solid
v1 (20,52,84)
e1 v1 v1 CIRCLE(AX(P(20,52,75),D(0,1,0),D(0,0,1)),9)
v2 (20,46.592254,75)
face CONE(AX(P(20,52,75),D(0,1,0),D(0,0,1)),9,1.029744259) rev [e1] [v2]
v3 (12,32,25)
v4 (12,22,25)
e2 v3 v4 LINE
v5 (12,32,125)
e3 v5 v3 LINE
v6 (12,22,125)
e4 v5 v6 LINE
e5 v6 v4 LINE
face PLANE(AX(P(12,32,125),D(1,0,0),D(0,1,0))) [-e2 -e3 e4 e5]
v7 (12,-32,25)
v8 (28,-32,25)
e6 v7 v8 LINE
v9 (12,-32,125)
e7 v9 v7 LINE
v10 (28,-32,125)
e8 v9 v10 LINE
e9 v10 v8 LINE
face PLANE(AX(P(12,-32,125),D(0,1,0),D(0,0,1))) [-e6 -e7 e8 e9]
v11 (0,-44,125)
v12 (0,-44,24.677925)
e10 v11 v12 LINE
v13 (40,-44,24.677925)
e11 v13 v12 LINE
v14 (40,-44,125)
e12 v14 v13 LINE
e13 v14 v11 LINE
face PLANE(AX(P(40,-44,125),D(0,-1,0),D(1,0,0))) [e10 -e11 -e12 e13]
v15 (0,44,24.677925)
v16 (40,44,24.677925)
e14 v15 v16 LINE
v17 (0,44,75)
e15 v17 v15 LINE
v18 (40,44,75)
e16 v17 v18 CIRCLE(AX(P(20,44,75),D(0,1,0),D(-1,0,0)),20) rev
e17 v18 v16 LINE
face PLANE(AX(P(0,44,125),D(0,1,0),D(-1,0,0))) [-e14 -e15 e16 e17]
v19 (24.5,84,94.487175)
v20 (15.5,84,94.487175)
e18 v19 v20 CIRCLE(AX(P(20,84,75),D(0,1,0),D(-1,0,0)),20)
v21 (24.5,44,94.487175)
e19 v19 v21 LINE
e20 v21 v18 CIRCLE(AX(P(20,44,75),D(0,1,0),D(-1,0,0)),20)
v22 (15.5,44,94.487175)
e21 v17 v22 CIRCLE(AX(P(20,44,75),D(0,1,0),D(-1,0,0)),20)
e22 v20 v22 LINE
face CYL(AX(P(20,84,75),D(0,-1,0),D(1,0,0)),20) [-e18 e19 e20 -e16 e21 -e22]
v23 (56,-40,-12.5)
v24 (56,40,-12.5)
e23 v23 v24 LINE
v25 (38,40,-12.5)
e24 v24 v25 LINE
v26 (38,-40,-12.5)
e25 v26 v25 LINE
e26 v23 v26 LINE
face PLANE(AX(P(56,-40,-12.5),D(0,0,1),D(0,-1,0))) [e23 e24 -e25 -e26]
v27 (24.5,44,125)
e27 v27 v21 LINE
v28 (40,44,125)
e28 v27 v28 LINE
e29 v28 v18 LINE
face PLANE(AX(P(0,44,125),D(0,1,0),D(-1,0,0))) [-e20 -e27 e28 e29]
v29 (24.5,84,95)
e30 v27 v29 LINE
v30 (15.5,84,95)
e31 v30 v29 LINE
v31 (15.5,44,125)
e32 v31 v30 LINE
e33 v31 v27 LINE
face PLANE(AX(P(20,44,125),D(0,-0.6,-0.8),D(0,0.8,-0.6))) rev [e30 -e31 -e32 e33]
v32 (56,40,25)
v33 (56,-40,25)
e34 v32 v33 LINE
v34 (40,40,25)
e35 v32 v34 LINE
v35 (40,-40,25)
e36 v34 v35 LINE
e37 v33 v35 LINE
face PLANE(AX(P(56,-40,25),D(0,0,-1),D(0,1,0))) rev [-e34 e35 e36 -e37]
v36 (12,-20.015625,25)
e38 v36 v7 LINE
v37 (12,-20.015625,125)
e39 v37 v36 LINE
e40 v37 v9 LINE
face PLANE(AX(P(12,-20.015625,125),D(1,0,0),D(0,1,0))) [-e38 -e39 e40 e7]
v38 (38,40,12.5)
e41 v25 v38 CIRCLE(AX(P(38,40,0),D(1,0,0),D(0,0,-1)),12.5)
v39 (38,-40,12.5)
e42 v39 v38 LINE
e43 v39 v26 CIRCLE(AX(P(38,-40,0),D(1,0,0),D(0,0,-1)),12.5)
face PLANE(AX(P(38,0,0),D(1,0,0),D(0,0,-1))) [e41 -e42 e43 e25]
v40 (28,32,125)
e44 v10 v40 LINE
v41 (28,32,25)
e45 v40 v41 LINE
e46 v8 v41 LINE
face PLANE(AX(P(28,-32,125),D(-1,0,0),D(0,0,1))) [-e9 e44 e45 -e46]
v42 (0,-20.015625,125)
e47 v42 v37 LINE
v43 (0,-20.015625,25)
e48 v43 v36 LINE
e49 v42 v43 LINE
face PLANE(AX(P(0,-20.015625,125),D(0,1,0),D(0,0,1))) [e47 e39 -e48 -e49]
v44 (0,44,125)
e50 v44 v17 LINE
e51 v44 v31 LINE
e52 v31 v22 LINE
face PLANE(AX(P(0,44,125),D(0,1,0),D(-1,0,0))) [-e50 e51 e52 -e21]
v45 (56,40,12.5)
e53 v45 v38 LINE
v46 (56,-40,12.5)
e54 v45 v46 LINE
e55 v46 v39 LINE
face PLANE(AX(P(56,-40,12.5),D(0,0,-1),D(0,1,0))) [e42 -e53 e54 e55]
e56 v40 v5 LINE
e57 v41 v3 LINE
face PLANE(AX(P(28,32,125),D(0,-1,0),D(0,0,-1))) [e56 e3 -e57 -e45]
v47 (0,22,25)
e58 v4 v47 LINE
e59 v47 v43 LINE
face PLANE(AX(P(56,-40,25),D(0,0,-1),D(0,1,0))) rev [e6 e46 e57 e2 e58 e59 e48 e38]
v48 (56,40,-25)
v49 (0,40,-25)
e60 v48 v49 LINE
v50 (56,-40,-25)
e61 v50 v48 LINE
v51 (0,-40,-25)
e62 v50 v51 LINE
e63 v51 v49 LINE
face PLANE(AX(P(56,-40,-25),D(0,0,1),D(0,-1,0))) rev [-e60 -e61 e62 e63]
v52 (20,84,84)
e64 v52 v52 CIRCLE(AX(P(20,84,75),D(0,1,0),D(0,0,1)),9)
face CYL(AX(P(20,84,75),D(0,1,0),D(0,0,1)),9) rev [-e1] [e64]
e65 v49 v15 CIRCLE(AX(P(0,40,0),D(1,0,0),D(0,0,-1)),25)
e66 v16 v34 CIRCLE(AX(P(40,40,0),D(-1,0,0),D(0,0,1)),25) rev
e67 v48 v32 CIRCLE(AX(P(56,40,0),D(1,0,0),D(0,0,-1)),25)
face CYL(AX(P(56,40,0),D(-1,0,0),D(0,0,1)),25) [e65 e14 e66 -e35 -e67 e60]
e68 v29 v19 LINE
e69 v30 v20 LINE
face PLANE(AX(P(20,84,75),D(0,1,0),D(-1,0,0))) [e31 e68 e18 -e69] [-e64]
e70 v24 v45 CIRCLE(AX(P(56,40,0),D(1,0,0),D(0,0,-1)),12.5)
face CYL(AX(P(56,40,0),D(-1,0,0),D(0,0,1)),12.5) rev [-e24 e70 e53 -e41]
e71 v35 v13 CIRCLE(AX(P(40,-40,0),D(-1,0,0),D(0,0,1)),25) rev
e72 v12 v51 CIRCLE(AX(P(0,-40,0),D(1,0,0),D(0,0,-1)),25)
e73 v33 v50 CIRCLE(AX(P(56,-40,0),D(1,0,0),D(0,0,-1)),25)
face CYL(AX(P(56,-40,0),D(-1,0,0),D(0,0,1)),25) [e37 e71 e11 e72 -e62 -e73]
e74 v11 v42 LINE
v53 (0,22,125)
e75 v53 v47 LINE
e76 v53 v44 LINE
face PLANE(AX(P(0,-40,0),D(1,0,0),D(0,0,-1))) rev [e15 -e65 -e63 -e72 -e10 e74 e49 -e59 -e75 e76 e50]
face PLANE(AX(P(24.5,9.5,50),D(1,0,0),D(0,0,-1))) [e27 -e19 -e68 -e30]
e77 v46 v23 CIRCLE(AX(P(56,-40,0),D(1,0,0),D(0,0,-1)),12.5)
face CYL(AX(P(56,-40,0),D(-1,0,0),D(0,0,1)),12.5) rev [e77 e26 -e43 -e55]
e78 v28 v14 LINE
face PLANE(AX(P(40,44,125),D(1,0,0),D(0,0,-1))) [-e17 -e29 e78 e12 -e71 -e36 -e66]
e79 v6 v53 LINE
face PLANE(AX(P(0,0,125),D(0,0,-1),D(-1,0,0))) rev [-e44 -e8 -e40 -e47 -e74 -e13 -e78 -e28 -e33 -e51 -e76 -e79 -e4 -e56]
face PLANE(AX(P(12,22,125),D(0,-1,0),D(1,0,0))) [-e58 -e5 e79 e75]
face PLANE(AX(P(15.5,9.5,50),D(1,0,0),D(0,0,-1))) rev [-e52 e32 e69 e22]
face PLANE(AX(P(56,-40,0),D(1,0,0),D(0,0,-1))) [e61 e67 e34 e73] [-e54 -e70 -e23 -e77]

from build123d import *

# Parameters (mm, degrees)
BOSS_EXTRUDE1_DEPTH        = 56
BOSS_EXTRUDE2_DEPTH        = 38
BOSS_EXTRUDE3_START        = -0.322075
BOSS_EXTRUDE3_DEPTH        = 100.322075
SKETCH3_R                  = 20
BOSS_EXTRUDE4_DEPTH        = 40
RIB2_START                 = -4.5
RIB2_DEPTH                 = 9
F_10_0MM_DOWEL_HOLE1_D     = 18
F_10_0MM_DOWEL_HOLE1_DEPTH = 32
F_10_0MM_DOWEL_HOLE1_TIP   = 5.407745571


with BuildPart() as part:
    # Sketch1 → Boss-Extrude1 (new body)
    with BuildSketch(Plane(origin=(0, 0, 0), x_dir=(0, 0, -1), z_dir=(1, 0, 0))):
        with BuildLine():
            Line((-25, -40), (-25, 40))
            ThreePointArc((-25, 40), (0, 65), (25, 40))
            Line((25, 40), (25, -40))
            ThreePointArc((25, -40), (0, -65), (-25, -40))
        make_face()
        with BuildLine():
            Line((-12.5, -40), (-12.5, 40))
            ThreePointArc((-12.5, 40), (0, 52.5), (12.5, 40))
            Line((12.5, 40), (12.5, -40))
            ThreePointArc((12.5, -40), (0, -52.5), (-12.5, -40))
        make_face(mode=Mode.SUBTRACT)
    extrude(amount=BOSS_EXTRUDE1_DEPTH)

    # Sketch1<2> → Boss-Extrude2 (add)
    with BuildSketch(Plane(origin=(0, 0, 0), x_dir=(0, 0, -1), z_dir=(1, 0, 0))):
        with BuildLine():
            Line((12.5, -40), (12.5, 40))
            ThreePointArc((12.5, 40), (0, 52.5), (-12.5, 40))
            Line((-12.5, 40), (-12.5, -40))
            ThreePointArc((-12.5, -40), (0, -52.5), (12.5, -40))
        make_face()
    extrude(amount=BOSS_EXTRUDE2_DEPTH)

    # Sketch2 → Boss-Extrude3 (add)
    with BuildSketch(Plane.XY.offset(25).offset(BOSS_EXTRUDE3_START)):
        Polygon((0, 22), (0, 44), (40, 44), (40, -44), (0, -44), (0, -20.015625235), (12, -20.015625235), (12, -32), (28, -32), (28, 32), (12, 32), (12, 22), align=None)
    extrude(amount=BOSS_EXTRUDE3_DEPTH)

    # Sketch3 → Boss-Extrude4 (add)
    with BuildSketch(Plane(origin=(0, 44, 0), x_dir=(1, 0, 0), z_dir=(0, 1, 0))):
        with Locations(Location((20, -75, 0), (0, 0, 180))):
            Circle(SKETCH3_R)
    extrude(amount=BOSS_EXTRUDE4_DEPTH)

    # Rib2: read off the stored shape, not the designer's step
    # Rib2 outline → Rib2 (add)
    with BuildSketch(Plane(origin=(20, 0, 0), x_dir=(0, 0, -1), z_dir=(1, 0, 0)).offset(RIB2_START)):
        Polygon((-125, 44), (-94.48717527, 44), (-94.48717527, 84), (-95, 84), align=None)
    extrude(amount=RIB2_DEPTH)

    # Ø10.0mm Dowel Hole1
    with Locations(Plane(origin=(20, 84, 75), x_dir=(1, 0, 0), z_dir=(0, 1, 0))):
        with Locations((0, 0)):
            Hole(F_10_0MM_DOWEL_HOLE1_D / 2, depth=F_10_0MM_DOWEL_HOLE1_DEPTH)
            with Locations((0, 0, -(F_10_0MM_DOWEL_HOLE1_DEPTH + F_10_0MM_DOWEL_HOLE1_TIP / 2))):  # 118° drill point
                Cone(0, F_10_0MM_DOWEL_HOLE1_D / 2, F_10_0MM_DOWEL_HOLE1_TIP, mode=Mode.SUBTRACT)


solid = part.part
